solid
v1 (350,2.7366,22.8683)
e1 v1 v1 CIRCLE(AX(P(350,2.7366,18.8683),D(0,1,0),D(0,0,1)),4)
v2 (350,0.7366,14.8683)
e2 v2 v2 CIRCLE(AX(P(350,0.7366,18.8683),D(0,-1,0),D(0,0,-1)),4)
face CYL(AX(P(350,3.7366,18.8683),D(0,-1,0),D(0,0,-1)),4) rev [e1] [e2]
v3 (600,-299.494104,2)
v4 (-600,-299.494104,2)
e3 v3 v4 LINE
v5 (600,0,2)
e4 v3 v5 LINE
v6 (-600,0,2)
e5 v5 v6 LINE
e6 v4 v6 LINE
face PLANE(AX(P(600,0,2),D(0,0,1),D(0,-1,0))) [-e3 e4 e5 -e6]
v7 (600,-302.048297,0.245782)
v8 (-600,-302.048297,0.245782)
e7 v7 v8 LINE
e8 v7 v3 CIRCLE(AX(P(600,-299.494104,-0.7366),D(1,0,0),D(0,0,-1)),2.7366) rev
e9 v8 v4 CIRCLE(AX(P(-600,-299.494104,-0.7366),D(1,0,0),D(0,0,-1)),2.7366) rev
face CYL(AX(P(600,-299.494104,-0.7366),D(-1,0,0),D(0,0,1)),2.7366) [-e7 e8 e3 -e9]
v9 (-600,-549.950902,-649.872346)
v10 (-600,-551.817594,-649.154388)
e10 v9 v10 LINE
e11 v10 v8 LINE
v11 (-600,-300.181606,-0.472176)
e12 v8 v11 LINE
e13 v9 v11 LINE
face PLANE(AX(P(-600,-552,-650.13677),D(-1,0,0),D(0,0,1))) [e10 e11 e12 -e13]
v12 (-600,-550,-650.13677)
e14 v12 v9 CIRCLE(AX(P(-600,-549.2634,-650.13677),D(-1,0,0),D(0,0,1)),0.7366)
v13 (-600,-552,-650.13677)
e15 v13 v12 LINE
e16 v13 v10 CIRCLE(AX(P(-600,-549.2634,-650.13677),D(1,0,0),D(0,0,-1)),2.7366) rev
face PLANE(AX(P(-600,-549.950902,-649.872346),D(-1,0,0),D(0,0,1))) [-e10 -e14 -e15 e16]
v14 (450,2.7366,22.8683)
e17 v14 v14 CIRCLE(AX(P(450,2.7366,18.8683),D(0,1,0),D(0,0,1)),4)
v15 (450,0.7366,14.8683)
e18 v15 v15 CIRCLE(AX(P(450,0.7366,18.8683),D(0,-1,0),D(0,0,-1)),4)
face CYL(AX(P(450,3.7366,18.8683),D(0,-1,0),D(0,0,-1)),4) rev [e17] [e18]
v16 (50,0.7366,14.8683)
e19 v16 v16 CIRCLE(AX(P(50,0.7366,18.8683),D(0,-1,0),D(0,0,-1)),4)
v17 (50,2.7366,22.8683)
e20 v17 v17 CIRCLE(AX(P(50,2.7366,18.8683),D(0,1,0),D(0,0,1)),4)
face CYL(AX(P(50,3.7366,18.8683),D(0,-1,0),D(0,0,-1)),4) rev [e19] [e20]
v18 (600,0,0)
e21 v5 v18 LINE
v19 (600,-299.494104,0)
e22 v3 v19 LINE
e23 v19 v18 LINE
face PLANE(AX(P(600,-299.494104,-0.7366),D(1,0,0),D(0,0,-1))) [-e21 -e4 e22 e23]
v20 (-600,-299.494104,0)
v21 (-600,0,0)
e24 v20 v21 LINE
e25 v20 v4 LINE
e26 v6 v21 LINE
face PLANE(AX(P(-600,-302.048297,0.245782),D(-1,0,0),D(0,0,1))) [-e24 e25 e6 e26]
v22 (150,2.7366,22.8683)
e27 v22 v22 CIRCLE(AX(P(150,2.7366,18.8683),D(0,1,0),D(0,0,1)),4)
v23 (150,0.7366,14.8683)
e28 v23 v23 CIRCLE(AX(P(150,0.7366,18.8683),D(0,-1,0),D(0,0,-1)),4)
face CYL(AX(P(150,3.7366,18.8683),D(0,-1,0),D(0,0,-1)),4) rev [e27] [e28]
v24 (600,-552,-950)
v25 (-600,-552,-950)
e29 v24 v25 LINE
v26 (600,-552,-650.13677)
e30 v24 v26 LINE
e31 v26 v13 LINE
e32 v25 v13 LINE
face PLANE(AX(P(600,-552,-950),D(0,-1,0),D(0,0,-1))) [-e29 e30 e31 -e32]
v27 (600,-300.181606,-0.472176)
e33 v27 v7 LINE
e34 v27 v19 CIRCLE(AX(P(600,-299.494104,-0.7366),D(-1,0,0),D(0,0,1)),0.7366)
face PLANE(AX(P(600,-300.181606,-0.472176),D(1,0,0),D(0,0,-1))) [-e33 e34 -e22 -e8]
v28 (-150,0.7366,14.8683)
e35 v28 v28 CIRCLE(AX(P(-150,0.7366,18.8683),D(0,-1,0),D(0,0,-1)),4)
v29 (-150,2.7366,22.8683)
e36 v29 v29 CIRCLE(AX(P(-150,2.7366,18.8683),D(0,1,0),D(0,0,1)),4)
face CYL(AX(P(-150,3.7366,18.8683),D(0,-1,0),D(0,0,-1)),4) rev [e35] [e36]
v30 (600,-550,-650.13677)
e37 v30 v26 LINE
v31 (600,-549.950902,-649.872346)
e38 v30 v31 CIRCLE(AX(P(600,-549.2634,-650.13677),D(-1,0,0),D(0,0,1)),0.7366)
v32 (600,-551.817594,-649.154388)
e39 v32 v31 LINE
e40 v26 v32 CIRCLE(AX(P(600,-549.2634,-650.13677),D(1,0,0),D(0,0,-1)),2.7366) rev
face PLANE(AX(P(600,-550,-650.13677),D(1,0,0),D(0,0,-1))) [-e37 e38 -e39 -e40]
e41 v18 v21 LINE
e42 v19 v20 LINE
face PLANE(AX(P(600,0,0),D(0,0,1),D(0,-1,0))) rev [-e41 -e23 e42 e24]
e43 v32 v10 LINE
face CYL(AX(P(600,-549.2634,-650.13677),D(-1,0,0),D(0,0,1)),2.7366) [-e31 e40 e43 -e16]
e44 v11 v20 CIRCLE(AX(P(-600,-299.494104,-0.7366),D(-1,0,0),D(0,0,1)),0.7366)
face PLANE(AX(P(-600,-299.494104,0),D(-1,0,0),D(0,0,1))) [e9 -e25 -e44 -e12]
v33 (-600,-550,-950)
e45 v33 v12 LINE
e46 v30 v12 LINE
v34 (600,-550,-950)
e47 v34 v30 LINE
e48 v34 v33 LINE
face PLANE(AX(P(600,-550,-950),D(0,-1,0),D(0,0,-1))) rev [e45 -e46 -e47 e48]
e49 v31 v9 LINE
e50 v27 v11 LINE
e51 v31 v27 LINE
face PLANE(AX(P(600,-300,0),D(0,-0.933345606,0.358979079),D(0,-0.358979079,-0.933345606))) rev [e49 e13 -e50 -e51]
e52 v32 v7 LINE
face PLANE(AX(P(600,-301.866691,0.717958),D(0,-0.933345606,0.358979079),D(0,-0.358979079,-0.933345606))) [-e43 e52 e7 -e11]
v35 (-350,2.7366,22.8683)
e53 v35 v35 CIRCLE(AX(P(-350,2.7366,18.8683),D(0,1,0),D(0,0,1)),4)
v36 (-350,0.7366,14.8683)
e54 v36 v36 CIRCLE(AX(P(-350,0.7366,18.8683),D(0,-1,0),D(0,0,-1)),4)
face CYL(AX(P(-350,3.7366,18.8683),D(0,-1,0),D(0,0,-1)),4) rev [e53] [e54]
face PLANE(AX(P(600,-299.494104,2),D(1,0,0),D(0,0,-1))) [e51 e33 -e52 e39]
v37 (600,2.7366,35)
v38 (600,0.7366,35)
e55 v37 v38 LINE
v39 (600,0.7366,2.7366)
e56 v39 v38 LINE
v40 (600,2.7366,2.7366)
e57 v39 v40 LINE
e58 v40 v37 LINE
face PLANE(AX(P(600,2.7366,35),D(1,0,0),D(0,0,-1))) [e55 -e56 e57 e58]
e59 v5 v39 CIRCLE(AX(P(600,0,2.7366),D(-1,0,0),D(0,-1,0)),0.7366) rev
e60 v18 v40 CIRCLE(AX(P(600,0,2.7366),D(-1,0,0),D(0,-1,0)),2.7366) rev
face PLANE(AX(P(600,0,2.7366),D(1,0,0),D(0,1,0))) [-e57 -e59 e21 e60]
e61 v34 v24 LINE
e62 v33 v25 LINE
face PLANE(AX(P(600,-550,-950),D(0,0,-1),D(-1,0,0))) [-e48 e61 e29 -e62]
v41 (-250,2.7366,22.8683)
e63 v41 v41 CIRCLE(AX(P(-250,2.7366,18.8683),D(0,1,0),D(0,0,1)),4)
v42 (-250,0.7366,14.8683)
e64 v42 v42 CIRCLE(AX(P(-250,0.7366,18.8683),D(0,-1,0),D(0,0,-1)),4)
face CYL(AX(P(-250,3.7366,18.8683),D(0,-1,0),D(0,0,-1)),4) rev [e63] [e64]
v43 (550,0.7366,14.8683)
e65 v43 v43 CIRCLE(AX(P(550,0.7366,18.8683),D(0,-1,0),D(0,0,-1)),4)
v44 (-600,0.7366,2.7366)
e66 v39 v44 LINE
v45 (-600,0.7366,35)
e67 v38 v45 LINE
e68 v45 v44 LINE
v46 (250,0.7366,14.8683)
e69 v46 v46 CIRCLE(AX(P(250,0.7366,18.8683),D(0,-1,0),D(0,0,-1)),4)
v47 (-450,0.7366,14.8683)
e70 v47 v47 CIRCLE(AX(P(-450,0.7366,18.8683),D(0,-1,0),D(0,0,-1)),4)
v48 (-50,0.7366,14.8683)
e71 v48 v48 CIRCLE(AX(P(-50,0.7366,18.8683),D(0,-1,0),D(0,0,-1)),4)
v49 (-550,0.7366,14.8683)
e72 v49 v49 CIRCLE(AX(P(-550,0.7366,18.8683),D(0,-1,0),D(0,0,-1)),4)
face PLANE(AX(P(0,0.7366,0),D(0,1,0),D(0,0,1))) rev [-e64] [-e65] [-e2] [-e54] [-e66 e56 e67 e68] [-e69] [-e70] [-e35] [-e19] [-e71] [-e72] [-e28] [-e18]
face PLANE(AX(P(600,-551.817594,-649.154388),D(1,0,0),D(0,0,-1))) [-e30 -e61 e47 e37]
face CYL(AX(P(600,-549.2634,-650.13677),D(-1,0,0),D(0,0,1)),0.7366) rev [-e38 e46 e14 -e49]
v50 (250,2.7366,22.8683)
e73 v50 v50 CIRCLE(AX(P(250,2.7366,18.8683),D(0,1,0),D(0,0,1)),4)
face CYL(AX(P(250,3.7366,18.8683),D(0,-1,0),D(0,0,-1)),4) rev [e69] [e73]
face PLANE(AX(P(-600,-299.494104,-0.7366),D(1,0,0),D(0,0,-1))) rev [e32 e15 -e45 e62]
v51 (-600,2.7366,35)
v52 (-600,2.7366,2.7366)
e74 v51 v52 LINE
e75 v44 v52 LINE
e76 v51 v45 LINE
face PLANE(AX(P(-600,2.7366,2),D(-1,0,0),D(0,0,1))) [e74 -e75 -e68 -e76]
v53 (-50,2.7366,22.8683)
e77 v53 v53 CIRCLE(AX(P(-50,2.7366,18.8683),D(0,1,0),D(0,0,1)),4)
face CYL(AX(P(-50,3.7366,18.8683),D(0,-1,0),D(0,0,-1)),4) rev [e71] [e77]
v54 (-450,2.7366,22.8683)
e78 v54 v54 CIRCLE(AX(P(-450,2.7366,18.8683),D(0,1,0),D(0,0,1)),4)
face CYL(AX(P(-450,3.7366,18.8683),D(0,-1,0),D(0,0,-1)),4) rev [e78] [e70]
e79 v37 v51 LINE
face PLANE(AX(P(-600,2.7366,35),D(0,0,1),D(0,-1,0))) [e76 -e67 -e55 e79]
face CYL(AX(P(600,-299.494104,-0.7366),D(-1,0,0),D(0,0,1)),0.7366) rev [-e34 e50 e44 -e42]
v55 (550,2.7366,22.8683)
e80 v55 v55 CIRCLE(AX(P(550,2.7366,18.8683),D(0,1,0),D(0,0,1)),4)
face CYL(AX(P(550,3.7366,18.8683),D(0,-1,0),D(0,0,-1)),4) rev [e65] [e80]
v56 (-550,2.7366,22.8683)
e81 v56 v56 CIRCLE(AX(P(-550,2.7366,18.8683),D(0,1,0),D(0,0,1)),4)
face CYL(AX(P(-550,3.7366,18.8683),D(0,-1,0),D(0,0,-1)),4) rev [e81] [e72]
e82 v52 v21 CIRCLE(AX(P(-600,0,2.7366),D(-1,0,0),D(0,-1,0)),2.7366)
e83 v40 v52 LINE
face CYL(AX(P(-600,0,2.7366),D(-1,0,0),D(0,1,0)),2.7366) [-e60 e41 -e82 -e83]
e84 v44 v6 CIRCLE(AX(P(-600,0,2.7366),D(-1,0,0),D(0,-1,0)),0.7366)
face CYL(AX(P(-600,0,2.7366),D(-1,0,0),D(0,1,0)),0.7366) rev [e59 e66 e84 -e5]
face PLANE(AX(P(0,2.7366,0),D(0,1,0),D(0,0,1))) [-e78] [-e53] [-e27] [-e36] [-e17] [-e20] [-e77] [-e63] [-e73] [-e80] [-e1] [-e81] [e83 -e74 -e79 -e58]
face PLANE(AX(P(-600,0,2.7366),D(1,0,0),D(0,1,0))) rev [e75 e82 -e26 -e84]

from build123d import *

# Parameters (mm, degrees)
BASE_FLANGE1_DEPTH = 600
EDGE_FLANGE1_DEPTH = 1200
SKETCH7_R          = 4
CUT_EXTRUDE1_DEPTH = 10


# Sheet-metal steps are written as plain solids
with BuildPart() as part:
    # Sketch1 → Base-Flange1 (new, symmetric)
    with BuildSketch(Plane(origin=(0, 0, 0), x_dir=(0, 0, -1), z_dir=(1, 0, 0))):
        with BuildLine():
            Line((0, 0), (0, -299.494103784))
            ThreePointArc((0, -299.494103784), (0.129412109, -299.911119881), (0.47217601, -300.181606158))
            Line((0.47217601, -300.181606158), (649.872346171, -549.950902374))
            ThreePointArc((649.872346171, -549.950902374), (650.002298395, -549.987621585), (650.136770161, -550))
            Line((650.136770161, -550), (950, -550))
            Line((950, -550), (950, -552))
            Line((950, -552), (650.136717071, -552))
            ThreePointArc((650.136717071, -552), (649.637152182, -551.954006147), (649.154377846, -551.817589676))
            Line((649.154377846, -551.817589676), (-0.245782148, -302.04829737))
            ThreePointArc((-0.245782148, -302.04829737), (-1.519211001, -301.043392746), (-2, -299.494103784))
            Line((-2, -299.494103784), (-2, 0))
            Line((-2, 0), (0, 0))
        make_face()
    extrude(amount=BASE_FLANGE1_DEPTH, both=True)

    # Edge-Flange1 section (across the edge) → Edge-Flange1 (add)
    with BuildSketch(Plane(origin=(600, 0.7366, 2), x_dir=(0, -1, 0), z_dir=(-1, 0, 0))):
        with BuildLine():
            Line((-2, 0.7366), (-2, 33))
            Line((-2, 33), (0, 33))
            Line((0, 33), (0, 0.7366))
            ThreePointArc((0, 0.7366), (0.215745145, 0.215745145), (0.7366, 0))
            Line((0.7366, 0), (0.7366, -2))
            ThreePointArc((0.7366, -2), (-1.198468417, -1.198468417), (-2, 0.7366))
        make_face()
    extrude(amount=EDGE_FLANGE1_DEPTH)

    # Sketch7 → Cut-Extrude1 (cut)
    with BuildSketch(Plane.XZ.offset(-0.7366)):
        with Locations(Location((-550, 18.8683, 0), (0, 0, 270))):
            Circle(SKETCH7_R)
        with Locations(Location((-450, 18.8683, 0), (0, 0, 270))):
            Circle(SKETCH7_R)
        with Locations(Location((-350, 18.8683, 0), (0, 0, 270))):
            Circle(SKETCH7_R)
        with Locations(Location((-250, 18.8683, 0), (0, 0, 270))):
            Circle(SKETCH7_R)
        with Locations(Location((-150, 18.8683, 0), (0, 0, 270))):
            Circle(SKETCH7_R)
        with Locations(Location((-50, 18.8683, 0), (0, 0, 270))):
            Circle(SKETCH7_R)
        with Locations(Location((50, 18.8683, 0), (0, 0, 270))):
            Circle(SKETCH7_R)
        with Locations(Location((150, 18.8683, 0), (0, 0, 270))):
            Circle(SKETCH7_R)
        with Locations(Location((250, 18.8683, 0), (0, 0, 270))):
            Circle(SKETCH7_R)
        with Locations(Location((350, 18.8683, 0), (0, 0, 270))):
            Circle(SKETCH7_R)
        with Locations(Location((450, 18.8683, 0), (0, 0, 270))):
            Circle(SKETCH7_R)
        with Locations(Location((550, 18.8683, 0), (0, 0, 270))):
            Circle(SKETCH7_R)
    extrude(amount=-CUT_EXTRUDE1_DEPTH, mode=Mode.SUBTRACT)


solid = part.part
